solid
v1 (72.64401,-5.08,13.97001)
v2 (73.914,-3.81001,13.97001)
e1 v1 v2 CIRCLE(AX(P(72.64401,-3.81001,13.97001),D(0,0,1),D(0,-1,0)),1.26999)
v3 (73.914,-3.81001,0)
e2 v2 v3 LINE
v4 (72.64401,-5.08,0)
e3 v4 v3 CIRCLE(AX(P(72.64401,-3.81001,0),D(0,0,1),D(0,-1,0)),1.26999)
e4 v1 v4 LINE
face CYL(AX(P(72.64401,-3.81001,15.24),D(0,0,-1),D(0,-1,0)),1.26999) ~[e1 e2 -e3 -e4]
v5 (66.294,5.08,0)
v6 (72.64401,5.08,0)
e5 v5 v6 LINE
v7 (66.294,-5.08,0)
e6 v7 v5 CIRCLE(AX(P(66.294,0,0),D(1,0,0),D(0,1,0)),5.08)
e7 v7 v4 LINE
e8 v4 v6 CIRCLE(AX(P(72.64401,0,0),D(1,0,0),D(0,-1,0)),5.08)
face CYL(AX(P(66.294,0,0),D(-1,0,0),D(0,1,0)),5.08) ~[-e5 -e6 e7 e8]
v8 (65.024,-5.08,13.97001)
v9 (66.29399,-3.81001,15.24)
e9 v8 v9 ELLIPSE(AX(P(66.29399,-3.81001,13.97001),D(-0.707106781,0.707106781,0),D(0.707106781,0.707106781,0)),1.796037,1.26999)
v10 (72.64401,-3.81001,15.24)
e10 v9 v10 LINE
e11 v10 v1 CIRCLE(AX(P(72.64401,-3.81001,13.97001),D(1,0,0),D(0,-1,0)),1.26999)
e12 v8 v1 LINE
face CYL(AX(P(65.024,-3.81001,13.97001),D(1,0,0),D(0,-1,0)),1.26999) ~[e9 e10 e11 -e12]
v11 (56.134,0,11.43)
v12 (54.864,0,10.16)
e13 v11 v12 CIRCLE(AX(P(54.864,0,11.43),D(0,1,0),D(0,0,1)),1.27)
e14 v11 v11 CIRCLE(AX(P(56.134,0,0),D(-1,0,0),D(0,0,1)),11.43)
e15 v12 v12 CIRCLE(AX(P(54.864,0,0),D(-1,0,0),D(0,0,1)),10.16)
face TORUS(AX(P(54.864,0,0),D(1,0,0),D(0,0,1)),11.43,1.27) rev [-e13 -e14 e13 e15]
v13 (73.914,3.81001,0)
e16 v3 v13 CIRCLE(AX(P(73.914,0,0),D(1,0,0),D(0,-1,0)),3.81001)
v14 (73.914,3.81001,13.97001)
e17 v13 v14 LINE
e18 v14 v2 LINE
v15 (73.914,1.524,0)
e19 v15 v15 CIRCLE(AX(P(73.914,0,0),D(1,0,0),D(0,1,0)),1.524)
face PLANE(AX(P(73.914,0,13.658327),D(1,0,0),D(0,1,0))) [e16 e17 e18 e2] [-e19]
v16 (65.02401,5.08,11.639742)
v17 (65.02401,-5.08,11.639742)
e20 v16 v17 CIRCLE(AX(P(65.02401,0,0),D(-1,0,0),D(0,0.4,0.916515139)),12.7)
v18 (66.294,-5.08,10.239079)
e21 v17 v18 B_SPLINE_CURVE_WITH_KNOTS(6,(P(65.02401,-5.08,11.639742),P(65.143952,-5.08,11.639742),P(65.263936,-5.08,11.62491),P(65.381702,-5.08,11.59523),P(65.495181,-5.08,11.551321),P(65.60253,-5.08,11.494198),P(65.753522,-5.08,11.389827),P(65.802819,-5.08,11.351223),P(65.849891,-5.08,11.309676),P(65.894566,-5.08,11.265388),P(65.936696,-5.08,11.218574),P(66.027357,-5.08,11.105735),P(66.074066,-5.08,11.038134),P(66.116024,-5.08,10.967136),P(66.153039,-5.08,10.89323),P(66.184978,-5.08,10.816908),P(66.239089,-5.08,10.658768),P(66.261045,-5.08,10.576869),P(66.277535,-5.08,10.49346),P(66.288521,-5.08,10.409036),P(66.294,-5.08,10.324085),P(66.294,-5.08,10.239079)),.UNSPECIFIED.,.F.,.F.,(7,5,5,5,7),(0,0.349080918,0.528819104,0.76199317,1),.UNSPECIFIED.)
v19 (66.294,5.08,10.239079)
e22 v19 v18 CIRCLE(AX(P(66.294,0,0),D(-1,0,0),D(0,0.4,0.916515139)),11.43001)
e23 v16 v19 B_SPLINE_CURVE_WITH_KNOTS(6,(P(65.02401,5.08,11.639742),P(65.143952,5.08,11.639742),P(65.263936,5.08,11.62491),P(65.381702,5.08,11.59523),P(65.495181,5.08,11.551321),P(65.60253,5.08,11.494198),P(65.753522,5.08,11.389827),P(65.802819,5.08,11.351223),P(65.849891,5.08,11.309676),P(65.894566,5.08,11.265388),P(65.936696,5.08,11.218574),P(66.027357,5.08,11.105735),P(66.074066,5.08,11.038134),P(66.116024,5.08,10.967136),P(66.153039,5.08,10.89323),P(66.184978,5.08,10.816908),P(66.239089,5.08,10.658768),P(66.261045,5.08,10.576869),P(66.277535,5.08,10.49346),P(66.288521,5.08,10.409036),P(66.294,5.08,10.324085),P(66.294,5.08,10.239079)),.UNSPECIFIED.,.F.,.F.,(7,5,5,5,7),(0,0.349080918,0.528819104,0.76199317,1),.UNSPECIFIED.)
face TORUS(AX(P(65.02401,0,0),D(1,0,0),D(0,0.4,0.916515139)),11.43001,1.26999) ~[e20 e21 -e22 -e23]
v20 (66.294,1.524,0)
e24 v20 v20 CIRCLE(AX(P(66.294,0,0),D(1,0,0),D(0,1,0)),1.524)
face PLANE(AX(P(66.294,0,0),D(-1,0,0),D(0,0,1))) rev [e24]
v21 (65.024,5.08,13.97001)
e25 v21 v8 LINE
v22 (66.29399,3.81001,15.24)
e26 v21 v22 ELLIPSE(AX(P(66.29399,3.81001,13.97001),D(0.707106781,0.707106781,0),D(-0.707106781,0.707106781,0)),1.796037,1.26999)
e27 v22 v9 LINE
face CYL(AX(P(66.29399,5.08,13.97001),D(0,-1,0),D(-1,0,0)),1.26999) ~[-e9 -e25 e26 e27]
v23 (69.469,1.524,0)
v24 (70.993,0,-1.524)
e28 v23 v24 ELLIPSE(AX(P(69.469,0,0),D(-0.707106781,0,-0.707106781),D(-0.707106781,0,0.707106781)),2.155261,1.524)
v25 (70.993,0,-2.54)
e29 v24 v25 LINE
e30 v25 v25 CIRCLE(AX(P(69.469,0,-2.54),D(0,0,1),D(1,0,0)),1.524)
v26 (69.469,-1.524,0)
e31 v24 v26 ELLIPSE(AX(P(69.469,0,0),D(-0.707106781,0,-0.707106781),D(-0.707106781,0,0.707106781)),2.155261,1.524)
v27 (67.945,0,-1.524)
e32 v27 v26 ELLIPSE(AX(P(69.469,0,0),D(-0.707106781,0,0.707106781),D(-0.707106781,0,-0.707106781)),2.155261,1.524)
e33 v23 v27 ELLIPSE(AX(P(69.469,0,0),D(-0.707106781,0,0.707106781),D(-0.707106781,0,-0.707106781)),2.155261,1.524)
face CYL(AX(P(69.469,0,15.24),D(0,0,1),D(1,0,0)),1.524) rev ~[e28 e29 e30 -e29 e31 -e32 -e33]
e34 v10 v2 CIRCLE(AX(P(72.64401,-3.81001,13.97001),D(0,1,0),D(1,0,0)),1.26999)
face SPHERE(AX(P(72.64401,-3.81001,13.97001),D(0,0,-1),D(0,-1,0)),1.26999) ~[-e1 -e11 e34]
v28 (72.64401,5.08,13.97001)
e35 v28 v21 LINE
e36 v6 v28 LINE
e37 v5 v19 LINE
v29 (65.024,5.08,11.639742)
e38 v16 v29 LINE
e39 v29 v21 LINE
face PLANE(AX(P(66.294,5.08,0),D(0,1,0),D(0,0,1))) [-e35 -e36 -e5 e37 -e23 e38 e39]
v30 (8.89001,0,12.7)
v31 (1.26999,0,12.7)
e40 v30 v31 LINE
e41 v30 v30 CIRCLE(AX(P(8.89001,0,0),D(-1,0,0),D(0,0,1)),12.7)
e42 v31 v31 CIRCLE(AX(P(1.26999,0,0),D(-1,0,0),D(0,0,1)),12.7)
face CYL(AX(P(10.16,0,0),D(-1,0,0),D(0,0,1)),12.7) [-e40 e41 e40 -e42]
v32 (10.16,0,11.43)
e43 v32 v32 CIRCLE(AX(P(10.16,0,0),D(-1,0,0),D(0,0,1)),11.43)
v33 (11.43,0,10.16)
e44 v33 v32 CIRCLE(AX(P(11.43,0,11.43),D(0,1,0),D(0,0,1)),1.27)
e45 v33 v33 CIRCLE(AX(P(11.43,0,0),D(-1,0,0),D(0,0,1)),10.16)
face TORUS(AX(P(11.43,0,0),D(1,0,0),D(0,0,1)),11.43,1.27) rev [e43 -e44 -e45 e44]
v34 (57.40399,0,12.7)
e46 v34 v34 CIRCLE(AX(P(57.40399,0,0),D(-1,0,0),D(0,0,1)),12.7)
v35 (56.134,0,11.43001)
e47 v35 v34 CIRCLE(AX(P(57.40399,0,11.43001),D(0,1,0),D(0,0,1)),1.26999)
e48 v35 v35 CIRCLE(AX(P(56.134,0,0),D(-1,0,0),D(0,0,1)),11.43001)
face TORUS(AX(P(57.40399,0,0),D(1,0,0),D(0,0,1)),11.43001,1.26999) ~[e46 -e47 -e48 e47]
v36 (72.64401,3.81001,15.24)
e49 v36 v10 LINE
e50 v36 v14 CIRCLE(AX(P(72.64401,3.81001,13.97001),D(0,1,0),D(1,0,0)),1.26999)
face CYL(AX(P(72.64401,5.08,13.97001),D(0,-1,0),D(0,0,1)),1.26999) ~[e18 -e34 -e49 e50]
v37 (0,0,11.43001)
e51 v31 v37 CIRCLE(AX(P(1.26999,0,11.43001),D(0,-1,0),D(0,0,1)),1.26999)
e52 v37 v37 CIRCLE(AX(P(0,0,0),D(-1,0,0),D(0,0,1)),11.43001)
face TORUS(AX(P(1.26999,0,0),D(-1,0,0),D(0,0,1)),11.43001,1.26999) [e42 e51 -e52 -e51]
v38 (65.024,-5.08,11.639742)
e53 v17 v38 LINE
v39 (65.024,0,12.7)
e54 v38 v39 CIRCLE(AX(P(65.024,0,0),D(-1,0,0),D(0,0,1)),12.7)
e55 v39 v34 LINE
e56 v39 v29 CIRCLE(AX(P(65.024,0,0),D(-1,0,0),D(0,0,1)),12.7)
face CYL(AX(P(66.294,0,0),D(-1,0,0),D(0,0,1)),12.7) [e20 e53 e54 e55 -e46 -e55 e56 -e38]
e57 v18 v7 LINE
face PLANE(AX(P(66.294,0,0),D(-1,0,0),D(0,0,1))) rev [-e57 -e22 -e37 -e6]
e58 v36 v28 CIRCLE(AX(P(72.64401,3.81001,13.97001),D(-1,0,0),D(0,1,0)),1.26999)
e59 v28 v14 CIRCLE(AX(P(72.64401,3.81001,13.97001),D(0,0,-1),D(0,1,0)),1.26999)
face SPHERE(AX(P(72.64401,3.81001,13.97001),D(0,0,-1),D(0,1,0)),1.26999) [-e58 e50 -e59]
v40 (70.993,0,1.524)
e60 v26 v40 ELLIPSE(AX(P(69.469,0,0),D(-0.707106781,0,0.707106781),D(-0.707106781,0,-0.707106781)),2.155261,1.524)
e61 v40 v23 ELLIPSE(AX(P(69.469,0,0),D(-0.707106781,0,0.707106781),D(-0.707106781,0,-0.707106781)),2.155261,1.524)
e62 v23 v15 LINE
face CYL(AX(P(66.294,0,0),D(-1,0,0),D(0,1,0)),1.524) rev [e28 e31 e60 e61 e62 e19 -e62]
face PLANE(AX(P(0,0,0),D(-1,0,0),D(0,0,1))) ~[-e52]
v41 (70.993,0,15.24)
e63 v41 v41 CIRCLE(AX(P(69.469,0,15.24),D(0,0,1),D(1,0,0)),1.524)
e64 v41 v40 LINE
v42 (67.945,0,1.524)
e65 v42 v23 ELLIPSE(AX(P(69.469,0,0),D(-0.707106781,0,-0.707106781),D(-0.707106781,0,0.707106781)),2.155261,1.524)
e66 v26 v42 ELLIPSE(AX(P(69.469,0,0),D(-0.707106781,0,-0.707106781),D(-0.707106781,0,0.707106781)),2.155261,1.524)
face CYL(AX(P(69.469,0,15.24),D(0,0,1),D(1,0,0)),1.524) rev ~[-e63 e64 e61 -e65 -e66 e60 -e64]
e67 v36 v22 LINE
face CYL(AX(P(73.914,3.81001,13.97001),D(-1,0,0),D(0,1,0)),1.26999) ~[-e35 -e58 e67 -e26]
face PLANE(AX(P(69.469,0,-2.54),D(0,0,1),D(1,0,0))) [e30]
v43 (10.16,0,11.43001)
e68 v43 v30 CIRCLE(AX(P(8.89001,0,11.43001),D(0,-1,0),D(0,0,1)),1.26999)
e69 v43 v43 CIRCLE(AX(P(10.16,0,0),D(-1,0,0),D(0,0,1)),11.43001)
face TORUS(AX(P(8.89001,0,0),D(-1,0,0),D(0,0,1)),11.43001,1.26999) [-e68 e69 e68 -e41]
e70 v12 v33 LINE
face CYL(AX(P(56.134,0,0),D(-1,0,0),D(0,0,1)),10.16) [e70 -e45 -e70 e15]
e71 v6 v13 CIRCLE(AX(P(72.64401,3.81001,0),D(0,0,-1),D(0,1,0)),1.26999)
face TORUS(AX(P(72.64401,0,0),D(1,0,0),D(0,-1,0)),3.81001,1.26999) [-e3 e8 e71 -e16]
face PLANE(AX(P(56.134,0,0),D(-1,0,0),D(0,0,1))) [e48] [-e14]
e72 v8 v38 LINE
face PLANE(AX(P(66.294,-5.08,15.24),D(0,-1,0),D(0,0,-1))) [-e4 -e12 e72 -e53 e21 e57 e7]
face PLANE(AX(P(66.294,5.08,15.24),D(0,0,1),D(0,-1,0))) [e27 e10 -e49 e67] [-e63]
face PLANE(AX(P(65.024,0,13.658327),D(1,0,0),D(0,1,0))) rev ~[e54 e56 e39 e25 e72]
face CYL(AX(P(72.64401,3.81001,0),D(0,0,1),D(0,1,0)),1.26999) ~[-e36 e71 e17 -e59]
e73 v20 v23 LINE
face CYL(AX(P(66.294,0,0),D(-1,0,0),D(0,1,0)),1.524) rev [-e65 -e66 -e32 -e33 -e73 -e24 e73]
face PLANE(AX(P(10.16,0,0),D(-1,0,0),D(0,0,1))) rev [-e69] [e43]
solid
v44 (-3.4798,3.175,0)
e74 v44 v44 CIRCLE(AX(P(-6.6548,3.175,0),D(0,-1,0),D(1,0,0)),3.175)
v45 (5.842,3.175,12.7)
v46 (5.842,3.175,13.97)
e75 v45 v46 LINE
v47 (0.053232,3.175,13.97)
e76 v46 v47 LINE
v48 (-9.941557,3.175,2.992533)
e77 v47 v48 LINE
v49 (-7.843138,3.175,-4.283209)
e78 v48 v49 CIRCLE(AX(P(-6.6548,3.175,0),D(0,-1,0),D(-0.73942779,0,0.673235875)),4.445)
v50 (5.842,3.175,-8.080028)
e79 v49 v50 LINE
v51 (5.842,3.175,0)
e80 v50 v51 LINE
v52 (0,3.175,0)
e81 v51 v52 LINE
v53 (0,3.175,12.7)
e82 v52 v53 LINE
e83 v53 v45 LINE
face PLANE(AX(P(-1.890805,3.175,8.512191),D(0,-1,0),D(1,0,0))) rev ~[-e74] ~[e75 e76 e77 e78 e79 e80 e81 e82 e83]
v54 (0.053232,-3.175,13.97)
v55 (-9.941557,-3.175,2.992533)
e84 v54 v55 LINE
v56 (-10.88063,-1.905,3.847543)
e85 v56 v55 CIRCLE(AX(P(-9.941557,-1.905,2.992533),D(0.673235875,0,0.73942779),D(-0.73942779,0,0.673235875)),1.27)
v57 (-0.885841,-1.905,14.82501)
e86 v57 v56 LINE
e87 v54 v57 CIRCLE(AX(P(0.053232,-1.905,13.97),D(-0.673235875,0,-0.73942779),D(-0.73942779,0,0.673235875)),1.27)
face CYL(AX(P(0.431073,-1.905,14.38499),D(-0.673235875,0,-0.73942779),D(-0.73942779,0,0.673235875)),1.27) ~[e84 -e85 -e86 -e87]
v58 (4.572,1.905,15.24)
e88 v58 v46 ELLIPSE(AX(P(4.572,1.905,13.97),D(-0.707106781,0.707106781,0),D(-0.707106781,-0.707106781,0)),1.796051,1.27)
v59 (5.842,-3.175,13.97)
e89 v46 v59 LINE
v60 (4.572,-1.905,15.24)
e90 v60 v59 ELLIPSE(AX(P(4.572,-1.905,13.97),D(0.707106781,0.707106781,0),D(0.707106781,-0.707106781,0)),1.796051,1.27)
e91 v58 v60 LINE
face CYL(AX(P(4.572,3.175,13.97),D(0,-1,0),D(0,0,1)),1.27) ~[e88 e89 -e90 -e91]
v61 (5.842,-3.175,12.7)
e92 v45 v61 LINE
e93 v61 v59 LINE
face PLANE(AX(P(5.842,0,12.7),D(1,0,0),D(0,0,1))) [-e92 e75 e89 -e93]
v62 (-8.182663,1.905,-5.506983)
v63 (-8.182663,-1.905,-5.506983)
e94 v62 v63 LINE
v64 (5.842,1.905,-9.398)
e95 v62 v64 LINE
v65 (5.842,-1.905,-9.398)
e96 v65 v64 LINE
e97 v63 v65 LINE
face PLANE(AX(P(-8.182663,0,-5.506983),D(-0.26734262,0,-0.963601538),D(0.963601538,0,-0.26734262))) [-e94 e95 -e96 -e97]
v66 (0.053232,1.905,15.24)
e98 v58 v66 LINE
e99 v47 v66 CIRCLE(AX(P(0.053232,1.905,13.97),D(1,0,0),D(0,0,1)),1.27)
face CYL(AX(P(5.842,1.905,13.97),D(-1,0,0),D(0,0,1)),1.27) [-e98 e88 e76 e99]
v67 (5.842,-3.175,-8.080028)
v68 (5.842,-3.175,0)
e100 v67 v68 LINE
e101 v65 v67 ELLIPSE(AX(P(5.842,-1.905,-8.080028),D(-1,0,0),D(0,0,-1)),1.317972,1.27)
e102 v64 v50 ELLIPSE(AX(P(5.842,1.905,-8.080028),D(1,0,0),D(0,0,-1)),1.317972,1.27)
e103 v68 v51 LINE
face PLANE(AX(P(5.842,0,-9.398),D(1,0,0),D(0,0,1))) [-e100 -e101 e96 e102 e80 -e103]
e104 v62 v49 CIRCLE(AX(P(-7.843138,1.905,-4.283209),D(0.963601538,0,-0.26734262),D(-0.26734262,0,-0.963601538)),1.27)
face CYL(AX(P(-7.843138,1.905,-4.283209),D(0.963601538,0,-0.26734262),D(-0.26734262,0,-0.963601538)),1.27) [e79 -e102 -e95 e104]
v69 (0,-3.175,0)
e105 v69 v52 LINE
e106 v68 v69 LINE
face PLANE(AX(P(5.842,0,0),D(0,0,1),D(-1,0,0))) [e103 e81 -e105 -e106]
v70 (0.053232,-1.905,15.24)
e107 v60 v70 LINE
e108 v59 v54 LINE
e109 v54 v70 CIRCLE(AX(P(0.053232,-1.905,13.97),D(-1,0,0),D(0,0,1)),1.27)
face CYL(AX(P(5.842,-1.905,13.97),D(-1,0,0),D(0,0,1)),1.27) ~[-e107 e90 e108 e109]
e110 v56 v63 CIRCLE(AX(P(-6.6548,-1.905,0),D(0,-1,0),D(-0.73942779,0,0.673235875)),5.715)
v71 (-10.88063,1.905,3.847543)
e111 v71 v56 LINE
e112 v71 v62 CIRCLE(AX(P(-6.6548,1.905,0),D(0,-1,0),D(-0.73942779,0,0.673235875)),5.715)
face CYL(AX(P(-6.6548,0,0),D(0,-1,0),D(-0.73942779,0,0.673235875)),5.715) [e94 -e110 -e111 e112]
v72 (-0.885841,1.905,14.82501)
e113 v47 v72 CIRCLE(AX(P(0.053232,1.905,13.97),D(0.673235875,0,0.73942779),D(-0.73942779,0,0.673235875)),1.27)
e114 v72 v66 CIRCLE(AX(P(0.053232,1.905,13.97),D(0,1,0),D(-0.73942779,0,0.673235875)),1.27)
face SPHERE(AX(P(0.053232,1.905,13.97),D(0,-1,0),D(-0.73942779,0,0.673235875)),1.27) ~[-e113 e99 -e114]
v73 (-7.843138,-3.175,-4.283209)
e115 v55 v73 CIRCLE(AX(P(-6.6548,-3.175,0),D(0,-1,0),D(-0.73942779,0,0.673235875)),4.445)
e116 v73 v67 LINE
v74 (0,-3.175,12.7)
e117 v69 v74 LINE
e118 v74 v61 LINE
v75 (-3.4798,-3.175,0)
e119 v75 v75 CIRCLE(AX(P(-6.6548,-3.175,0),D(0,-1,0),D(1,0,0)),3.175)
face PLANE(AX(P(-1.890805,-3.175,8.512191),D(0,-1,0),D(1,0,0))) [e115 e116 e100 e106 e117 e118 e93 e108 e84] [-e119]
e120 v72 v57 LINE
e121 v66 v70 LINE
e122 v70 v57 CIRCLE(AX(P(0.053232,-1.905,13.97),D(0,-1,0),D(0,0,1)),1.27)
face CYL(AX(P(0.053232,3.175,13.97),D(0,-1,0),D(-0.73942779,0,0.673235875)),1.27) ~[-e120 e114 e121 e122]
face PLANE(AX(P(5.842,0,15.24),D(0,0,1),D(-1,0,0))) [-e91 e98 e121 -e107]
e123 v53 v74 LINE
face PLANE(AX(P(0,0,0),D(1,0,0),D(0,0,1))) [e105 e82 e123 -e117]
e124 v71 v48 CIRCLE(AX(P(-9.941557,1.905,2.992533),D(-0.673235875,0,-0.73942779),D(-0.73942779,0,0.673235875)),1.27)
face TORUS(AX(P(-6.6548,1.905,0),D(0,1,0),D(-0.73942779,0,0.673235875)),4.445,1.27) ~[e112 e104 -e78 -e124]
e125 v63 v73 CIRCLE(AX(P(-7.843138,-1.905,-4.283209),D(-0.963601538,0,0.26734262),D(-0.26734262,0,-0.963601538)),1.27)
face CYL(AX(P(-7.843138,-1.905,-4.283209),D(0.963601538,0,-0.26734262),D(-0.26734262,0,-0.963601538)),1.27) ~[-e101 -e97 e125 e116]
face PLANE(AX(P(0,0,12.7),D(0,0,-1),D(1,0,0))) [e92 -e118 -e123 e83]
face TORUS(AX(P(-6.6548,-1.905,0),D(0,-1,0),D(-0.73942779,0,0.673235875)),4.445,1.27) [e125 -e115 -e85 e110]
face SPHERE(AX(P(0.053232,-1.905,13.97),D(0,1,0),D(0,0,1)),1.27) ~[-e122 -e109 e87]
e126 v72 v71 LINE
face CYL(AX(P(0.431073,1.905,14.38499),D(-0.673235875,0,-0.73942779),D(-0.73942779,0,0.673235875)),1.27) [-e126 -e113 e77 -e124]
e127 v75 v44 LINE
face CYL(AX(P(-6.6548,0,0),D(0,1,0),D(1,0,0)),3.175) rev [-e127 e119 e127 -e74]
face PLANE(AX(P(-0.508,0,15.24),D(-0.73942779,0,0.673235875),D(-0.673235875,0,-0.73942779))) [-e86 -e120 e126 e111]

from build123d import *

# Parameters (mm, degrees)
F0_W          = 5.842
F0_H          = 12.7
F2_R          = 1.524
F3_DEPTH      = 7.62
F3_DEPTH_BACK = 1.27
F4_R          = 1.524
F5_DEPTH      = 17.78
F0_R          = 3.175
F6_DEPTH      = 3.175
F7_R          = 1.27
F8_R          = 1.27
F9_R          = 1.26999


# Not quite as in the source:
# - a fillet or chamfer is up to 0.001 mm smaller than in the source, because OpenCascade refuses the exact size


with BuildPart() as f1:
    # F0 (on Front) → F1 (revolve)
    with BuildSketch(Plane.XZ):
        with Locations((2.921, 6.35)):
            Rectangle(F0_W, F0_H)
        Polygon((5.842, 12.7), (5.842, 0), (66.294, 0), (66.294, 12.7), (56.134, 12.7), (56.134, 10.16), (10.16, 10.16), (10.16, 12.7), align=None)
    revolve(axis=Axis((33.147, 0, 0), (-1, 0, 0)))

    # F2 (on face) → F3 (join, two sides)
    with BuildSketch(Plane.YZ.offset(66.294)) as f3_sk:
        with BuildLine():
            ThreePointArc((-5.08, 11.6397422652), (0, 12.7), (5.08, 11.6397422652))
            Line((5.08, 11.6397422652), (5.08, 15.24))
            Line((5.08, 15.24), (-5.08, 15.24))
            Line((-5.08, 15.24), (-5.08, 11.6397422652))
        make_face()
        with BuildLine():
            ThreePointArc((-5.08, 0), (0, 5.08), (5.08, 0))
            Line((5.08, 0), (5.08, 11.6397422652))
            ThreePointArc((5.08, 11.6397422652), (0, 12.7), (-5.08, 11.6397422652))
            Line((-5.08, 11.6397422652), (-5.08, 0))
        make_face()
        with BuildLine():
            ThreePointArc((-5.08, 0), (0, -5.08), (5.08, 0))
            ThreePointArc((5.08, 0), (0, 5.08), (-5.08, 0))
        make_face()
        Circle(F2_R, mode=Mode.SUBTRACT)
    extrude(amount=F3_DEPTH)
    extrude(f3_sk.sketch, amount=-F3_DEPTH_BACK)

    # F4 (on face) → F5 (cut)
    with BuildSketch(Plane.XY.offset(15.24)):
        with Locations((69.469, 0)):
            Circle(F4_R)
    extrude(amount=-F5_DEPTH, mode=Mode.SUBTRACT)

    # F7
    f7_edges = [f1.edges().sort_by_distance(p)[0] for p in [
        (56.134, 0, -10.16),
        (10.16, 0, -10.16),
        (33.147, 0, 10.16),
    ]]
    fillet(f7_edges, radius=F7_R)

    # F9 (radius 1.27 in the source; OpenCascade refuses exactly that, so slightly less here)
    f9_edges = [f1.edges().sort_by_distance(p)[0] for p in [
        (56.134, 0, -12.7),
        (10.16, 0, -12.7),
        (0, 0, -12.7),
        (5.08, 0, 12.7),
        (66.294, 0, -12.7),
        (73.914, 5.08, 7.62),
        (69.469, 5.08, 15.24),
        (69.469, -5.08, 15.24),
        (73.914, 0, 15.24),
        (65.024, 0, 15.24),
    ]]
    fillet(f9_edges, radius=F9_R)


with BuildPart() as f6:
    # F0 (on Front) → F6 (new body, symmetric)
    with BuildSketch(Plane.XZ):
        with BuildLine():
            Line((-0.9398, 0), (0, 0))
            Line((0, 0), (0, 12.7))
            Line((0, 12.7), (5.842, 12.7))
            Line((5.842, 12.7), (5.842, 15.24))
            Line((5.842, 15.24), (-0.508, 15.24))
            Line((-0.508, 15.24), (-10.8806298187, 3.8475430269))
            ThreePointArc((-10.8806298187, 3.8475430269), (-4.5919612295, 5.3297205562), (-0.9398, 0))
        make_face()
        with BuildLine():
            ThreePointArc((-8.1826630726, -5.5069827884), (-3.1957909266, -4.5493385486), (-0.9398, 0))
            ThreePointArc((-0.9398, 0), (-4.5919612295, 5.3297205562), (-10.8806298187, 3.8475430269))
            ThreePointArc((-10.8806298187, 3.8475430269), (-12.1459778134, -1.5837270034), (-8.1826630726, -5.5069827884))
        make_face()
        with Locations((-6.6548, 0)):
            Circle(F0_R, mode=Mode.SUBTRACT)
        with BuildLine():
            Line((5.842, 0), (0, 0))
            Line((0, 0), (-0.9398, 0))
            ThreePointArc((-0.9398, 0), (-3.1957909266, -4.5493385486), (-8.1826630726, -5.5069827884))
            Line((-8.1826630726, -5.5069827884), (5.842, -9.398))
            Line((5.842, -9.398), (5.842, 0))
        make_face()
    extrude(amount=F6_DEPTH, both=True)

    # F8
    f8_edges = [f6.edges().sort_by_distance(p)[0] for p in [
        (5.842, 0, 15.24),
        (2.667, 3.175, 15.24),
        (-0.508, 0, 15.24),
        (2.667, -3.175, 15.24),
        (-5.694315, 3.175, 9.543772),
        (-12.145978, 3.175, -1.583727),
        (-1.170332, 3.175, -7.452491),
        (-1.170332, -3.175, -7.452491),
        (-10.88063, 0, 3.847543),
        (-8.182663, 0, -5.506983),
        (-12.145978, -3.175, -1.583727),
        (-5.694315, -3.175, 9.543772),
    ]]
    fillet(f8_edges, radius=F8_R)


solid = Compound([f1.part, f6.part])
